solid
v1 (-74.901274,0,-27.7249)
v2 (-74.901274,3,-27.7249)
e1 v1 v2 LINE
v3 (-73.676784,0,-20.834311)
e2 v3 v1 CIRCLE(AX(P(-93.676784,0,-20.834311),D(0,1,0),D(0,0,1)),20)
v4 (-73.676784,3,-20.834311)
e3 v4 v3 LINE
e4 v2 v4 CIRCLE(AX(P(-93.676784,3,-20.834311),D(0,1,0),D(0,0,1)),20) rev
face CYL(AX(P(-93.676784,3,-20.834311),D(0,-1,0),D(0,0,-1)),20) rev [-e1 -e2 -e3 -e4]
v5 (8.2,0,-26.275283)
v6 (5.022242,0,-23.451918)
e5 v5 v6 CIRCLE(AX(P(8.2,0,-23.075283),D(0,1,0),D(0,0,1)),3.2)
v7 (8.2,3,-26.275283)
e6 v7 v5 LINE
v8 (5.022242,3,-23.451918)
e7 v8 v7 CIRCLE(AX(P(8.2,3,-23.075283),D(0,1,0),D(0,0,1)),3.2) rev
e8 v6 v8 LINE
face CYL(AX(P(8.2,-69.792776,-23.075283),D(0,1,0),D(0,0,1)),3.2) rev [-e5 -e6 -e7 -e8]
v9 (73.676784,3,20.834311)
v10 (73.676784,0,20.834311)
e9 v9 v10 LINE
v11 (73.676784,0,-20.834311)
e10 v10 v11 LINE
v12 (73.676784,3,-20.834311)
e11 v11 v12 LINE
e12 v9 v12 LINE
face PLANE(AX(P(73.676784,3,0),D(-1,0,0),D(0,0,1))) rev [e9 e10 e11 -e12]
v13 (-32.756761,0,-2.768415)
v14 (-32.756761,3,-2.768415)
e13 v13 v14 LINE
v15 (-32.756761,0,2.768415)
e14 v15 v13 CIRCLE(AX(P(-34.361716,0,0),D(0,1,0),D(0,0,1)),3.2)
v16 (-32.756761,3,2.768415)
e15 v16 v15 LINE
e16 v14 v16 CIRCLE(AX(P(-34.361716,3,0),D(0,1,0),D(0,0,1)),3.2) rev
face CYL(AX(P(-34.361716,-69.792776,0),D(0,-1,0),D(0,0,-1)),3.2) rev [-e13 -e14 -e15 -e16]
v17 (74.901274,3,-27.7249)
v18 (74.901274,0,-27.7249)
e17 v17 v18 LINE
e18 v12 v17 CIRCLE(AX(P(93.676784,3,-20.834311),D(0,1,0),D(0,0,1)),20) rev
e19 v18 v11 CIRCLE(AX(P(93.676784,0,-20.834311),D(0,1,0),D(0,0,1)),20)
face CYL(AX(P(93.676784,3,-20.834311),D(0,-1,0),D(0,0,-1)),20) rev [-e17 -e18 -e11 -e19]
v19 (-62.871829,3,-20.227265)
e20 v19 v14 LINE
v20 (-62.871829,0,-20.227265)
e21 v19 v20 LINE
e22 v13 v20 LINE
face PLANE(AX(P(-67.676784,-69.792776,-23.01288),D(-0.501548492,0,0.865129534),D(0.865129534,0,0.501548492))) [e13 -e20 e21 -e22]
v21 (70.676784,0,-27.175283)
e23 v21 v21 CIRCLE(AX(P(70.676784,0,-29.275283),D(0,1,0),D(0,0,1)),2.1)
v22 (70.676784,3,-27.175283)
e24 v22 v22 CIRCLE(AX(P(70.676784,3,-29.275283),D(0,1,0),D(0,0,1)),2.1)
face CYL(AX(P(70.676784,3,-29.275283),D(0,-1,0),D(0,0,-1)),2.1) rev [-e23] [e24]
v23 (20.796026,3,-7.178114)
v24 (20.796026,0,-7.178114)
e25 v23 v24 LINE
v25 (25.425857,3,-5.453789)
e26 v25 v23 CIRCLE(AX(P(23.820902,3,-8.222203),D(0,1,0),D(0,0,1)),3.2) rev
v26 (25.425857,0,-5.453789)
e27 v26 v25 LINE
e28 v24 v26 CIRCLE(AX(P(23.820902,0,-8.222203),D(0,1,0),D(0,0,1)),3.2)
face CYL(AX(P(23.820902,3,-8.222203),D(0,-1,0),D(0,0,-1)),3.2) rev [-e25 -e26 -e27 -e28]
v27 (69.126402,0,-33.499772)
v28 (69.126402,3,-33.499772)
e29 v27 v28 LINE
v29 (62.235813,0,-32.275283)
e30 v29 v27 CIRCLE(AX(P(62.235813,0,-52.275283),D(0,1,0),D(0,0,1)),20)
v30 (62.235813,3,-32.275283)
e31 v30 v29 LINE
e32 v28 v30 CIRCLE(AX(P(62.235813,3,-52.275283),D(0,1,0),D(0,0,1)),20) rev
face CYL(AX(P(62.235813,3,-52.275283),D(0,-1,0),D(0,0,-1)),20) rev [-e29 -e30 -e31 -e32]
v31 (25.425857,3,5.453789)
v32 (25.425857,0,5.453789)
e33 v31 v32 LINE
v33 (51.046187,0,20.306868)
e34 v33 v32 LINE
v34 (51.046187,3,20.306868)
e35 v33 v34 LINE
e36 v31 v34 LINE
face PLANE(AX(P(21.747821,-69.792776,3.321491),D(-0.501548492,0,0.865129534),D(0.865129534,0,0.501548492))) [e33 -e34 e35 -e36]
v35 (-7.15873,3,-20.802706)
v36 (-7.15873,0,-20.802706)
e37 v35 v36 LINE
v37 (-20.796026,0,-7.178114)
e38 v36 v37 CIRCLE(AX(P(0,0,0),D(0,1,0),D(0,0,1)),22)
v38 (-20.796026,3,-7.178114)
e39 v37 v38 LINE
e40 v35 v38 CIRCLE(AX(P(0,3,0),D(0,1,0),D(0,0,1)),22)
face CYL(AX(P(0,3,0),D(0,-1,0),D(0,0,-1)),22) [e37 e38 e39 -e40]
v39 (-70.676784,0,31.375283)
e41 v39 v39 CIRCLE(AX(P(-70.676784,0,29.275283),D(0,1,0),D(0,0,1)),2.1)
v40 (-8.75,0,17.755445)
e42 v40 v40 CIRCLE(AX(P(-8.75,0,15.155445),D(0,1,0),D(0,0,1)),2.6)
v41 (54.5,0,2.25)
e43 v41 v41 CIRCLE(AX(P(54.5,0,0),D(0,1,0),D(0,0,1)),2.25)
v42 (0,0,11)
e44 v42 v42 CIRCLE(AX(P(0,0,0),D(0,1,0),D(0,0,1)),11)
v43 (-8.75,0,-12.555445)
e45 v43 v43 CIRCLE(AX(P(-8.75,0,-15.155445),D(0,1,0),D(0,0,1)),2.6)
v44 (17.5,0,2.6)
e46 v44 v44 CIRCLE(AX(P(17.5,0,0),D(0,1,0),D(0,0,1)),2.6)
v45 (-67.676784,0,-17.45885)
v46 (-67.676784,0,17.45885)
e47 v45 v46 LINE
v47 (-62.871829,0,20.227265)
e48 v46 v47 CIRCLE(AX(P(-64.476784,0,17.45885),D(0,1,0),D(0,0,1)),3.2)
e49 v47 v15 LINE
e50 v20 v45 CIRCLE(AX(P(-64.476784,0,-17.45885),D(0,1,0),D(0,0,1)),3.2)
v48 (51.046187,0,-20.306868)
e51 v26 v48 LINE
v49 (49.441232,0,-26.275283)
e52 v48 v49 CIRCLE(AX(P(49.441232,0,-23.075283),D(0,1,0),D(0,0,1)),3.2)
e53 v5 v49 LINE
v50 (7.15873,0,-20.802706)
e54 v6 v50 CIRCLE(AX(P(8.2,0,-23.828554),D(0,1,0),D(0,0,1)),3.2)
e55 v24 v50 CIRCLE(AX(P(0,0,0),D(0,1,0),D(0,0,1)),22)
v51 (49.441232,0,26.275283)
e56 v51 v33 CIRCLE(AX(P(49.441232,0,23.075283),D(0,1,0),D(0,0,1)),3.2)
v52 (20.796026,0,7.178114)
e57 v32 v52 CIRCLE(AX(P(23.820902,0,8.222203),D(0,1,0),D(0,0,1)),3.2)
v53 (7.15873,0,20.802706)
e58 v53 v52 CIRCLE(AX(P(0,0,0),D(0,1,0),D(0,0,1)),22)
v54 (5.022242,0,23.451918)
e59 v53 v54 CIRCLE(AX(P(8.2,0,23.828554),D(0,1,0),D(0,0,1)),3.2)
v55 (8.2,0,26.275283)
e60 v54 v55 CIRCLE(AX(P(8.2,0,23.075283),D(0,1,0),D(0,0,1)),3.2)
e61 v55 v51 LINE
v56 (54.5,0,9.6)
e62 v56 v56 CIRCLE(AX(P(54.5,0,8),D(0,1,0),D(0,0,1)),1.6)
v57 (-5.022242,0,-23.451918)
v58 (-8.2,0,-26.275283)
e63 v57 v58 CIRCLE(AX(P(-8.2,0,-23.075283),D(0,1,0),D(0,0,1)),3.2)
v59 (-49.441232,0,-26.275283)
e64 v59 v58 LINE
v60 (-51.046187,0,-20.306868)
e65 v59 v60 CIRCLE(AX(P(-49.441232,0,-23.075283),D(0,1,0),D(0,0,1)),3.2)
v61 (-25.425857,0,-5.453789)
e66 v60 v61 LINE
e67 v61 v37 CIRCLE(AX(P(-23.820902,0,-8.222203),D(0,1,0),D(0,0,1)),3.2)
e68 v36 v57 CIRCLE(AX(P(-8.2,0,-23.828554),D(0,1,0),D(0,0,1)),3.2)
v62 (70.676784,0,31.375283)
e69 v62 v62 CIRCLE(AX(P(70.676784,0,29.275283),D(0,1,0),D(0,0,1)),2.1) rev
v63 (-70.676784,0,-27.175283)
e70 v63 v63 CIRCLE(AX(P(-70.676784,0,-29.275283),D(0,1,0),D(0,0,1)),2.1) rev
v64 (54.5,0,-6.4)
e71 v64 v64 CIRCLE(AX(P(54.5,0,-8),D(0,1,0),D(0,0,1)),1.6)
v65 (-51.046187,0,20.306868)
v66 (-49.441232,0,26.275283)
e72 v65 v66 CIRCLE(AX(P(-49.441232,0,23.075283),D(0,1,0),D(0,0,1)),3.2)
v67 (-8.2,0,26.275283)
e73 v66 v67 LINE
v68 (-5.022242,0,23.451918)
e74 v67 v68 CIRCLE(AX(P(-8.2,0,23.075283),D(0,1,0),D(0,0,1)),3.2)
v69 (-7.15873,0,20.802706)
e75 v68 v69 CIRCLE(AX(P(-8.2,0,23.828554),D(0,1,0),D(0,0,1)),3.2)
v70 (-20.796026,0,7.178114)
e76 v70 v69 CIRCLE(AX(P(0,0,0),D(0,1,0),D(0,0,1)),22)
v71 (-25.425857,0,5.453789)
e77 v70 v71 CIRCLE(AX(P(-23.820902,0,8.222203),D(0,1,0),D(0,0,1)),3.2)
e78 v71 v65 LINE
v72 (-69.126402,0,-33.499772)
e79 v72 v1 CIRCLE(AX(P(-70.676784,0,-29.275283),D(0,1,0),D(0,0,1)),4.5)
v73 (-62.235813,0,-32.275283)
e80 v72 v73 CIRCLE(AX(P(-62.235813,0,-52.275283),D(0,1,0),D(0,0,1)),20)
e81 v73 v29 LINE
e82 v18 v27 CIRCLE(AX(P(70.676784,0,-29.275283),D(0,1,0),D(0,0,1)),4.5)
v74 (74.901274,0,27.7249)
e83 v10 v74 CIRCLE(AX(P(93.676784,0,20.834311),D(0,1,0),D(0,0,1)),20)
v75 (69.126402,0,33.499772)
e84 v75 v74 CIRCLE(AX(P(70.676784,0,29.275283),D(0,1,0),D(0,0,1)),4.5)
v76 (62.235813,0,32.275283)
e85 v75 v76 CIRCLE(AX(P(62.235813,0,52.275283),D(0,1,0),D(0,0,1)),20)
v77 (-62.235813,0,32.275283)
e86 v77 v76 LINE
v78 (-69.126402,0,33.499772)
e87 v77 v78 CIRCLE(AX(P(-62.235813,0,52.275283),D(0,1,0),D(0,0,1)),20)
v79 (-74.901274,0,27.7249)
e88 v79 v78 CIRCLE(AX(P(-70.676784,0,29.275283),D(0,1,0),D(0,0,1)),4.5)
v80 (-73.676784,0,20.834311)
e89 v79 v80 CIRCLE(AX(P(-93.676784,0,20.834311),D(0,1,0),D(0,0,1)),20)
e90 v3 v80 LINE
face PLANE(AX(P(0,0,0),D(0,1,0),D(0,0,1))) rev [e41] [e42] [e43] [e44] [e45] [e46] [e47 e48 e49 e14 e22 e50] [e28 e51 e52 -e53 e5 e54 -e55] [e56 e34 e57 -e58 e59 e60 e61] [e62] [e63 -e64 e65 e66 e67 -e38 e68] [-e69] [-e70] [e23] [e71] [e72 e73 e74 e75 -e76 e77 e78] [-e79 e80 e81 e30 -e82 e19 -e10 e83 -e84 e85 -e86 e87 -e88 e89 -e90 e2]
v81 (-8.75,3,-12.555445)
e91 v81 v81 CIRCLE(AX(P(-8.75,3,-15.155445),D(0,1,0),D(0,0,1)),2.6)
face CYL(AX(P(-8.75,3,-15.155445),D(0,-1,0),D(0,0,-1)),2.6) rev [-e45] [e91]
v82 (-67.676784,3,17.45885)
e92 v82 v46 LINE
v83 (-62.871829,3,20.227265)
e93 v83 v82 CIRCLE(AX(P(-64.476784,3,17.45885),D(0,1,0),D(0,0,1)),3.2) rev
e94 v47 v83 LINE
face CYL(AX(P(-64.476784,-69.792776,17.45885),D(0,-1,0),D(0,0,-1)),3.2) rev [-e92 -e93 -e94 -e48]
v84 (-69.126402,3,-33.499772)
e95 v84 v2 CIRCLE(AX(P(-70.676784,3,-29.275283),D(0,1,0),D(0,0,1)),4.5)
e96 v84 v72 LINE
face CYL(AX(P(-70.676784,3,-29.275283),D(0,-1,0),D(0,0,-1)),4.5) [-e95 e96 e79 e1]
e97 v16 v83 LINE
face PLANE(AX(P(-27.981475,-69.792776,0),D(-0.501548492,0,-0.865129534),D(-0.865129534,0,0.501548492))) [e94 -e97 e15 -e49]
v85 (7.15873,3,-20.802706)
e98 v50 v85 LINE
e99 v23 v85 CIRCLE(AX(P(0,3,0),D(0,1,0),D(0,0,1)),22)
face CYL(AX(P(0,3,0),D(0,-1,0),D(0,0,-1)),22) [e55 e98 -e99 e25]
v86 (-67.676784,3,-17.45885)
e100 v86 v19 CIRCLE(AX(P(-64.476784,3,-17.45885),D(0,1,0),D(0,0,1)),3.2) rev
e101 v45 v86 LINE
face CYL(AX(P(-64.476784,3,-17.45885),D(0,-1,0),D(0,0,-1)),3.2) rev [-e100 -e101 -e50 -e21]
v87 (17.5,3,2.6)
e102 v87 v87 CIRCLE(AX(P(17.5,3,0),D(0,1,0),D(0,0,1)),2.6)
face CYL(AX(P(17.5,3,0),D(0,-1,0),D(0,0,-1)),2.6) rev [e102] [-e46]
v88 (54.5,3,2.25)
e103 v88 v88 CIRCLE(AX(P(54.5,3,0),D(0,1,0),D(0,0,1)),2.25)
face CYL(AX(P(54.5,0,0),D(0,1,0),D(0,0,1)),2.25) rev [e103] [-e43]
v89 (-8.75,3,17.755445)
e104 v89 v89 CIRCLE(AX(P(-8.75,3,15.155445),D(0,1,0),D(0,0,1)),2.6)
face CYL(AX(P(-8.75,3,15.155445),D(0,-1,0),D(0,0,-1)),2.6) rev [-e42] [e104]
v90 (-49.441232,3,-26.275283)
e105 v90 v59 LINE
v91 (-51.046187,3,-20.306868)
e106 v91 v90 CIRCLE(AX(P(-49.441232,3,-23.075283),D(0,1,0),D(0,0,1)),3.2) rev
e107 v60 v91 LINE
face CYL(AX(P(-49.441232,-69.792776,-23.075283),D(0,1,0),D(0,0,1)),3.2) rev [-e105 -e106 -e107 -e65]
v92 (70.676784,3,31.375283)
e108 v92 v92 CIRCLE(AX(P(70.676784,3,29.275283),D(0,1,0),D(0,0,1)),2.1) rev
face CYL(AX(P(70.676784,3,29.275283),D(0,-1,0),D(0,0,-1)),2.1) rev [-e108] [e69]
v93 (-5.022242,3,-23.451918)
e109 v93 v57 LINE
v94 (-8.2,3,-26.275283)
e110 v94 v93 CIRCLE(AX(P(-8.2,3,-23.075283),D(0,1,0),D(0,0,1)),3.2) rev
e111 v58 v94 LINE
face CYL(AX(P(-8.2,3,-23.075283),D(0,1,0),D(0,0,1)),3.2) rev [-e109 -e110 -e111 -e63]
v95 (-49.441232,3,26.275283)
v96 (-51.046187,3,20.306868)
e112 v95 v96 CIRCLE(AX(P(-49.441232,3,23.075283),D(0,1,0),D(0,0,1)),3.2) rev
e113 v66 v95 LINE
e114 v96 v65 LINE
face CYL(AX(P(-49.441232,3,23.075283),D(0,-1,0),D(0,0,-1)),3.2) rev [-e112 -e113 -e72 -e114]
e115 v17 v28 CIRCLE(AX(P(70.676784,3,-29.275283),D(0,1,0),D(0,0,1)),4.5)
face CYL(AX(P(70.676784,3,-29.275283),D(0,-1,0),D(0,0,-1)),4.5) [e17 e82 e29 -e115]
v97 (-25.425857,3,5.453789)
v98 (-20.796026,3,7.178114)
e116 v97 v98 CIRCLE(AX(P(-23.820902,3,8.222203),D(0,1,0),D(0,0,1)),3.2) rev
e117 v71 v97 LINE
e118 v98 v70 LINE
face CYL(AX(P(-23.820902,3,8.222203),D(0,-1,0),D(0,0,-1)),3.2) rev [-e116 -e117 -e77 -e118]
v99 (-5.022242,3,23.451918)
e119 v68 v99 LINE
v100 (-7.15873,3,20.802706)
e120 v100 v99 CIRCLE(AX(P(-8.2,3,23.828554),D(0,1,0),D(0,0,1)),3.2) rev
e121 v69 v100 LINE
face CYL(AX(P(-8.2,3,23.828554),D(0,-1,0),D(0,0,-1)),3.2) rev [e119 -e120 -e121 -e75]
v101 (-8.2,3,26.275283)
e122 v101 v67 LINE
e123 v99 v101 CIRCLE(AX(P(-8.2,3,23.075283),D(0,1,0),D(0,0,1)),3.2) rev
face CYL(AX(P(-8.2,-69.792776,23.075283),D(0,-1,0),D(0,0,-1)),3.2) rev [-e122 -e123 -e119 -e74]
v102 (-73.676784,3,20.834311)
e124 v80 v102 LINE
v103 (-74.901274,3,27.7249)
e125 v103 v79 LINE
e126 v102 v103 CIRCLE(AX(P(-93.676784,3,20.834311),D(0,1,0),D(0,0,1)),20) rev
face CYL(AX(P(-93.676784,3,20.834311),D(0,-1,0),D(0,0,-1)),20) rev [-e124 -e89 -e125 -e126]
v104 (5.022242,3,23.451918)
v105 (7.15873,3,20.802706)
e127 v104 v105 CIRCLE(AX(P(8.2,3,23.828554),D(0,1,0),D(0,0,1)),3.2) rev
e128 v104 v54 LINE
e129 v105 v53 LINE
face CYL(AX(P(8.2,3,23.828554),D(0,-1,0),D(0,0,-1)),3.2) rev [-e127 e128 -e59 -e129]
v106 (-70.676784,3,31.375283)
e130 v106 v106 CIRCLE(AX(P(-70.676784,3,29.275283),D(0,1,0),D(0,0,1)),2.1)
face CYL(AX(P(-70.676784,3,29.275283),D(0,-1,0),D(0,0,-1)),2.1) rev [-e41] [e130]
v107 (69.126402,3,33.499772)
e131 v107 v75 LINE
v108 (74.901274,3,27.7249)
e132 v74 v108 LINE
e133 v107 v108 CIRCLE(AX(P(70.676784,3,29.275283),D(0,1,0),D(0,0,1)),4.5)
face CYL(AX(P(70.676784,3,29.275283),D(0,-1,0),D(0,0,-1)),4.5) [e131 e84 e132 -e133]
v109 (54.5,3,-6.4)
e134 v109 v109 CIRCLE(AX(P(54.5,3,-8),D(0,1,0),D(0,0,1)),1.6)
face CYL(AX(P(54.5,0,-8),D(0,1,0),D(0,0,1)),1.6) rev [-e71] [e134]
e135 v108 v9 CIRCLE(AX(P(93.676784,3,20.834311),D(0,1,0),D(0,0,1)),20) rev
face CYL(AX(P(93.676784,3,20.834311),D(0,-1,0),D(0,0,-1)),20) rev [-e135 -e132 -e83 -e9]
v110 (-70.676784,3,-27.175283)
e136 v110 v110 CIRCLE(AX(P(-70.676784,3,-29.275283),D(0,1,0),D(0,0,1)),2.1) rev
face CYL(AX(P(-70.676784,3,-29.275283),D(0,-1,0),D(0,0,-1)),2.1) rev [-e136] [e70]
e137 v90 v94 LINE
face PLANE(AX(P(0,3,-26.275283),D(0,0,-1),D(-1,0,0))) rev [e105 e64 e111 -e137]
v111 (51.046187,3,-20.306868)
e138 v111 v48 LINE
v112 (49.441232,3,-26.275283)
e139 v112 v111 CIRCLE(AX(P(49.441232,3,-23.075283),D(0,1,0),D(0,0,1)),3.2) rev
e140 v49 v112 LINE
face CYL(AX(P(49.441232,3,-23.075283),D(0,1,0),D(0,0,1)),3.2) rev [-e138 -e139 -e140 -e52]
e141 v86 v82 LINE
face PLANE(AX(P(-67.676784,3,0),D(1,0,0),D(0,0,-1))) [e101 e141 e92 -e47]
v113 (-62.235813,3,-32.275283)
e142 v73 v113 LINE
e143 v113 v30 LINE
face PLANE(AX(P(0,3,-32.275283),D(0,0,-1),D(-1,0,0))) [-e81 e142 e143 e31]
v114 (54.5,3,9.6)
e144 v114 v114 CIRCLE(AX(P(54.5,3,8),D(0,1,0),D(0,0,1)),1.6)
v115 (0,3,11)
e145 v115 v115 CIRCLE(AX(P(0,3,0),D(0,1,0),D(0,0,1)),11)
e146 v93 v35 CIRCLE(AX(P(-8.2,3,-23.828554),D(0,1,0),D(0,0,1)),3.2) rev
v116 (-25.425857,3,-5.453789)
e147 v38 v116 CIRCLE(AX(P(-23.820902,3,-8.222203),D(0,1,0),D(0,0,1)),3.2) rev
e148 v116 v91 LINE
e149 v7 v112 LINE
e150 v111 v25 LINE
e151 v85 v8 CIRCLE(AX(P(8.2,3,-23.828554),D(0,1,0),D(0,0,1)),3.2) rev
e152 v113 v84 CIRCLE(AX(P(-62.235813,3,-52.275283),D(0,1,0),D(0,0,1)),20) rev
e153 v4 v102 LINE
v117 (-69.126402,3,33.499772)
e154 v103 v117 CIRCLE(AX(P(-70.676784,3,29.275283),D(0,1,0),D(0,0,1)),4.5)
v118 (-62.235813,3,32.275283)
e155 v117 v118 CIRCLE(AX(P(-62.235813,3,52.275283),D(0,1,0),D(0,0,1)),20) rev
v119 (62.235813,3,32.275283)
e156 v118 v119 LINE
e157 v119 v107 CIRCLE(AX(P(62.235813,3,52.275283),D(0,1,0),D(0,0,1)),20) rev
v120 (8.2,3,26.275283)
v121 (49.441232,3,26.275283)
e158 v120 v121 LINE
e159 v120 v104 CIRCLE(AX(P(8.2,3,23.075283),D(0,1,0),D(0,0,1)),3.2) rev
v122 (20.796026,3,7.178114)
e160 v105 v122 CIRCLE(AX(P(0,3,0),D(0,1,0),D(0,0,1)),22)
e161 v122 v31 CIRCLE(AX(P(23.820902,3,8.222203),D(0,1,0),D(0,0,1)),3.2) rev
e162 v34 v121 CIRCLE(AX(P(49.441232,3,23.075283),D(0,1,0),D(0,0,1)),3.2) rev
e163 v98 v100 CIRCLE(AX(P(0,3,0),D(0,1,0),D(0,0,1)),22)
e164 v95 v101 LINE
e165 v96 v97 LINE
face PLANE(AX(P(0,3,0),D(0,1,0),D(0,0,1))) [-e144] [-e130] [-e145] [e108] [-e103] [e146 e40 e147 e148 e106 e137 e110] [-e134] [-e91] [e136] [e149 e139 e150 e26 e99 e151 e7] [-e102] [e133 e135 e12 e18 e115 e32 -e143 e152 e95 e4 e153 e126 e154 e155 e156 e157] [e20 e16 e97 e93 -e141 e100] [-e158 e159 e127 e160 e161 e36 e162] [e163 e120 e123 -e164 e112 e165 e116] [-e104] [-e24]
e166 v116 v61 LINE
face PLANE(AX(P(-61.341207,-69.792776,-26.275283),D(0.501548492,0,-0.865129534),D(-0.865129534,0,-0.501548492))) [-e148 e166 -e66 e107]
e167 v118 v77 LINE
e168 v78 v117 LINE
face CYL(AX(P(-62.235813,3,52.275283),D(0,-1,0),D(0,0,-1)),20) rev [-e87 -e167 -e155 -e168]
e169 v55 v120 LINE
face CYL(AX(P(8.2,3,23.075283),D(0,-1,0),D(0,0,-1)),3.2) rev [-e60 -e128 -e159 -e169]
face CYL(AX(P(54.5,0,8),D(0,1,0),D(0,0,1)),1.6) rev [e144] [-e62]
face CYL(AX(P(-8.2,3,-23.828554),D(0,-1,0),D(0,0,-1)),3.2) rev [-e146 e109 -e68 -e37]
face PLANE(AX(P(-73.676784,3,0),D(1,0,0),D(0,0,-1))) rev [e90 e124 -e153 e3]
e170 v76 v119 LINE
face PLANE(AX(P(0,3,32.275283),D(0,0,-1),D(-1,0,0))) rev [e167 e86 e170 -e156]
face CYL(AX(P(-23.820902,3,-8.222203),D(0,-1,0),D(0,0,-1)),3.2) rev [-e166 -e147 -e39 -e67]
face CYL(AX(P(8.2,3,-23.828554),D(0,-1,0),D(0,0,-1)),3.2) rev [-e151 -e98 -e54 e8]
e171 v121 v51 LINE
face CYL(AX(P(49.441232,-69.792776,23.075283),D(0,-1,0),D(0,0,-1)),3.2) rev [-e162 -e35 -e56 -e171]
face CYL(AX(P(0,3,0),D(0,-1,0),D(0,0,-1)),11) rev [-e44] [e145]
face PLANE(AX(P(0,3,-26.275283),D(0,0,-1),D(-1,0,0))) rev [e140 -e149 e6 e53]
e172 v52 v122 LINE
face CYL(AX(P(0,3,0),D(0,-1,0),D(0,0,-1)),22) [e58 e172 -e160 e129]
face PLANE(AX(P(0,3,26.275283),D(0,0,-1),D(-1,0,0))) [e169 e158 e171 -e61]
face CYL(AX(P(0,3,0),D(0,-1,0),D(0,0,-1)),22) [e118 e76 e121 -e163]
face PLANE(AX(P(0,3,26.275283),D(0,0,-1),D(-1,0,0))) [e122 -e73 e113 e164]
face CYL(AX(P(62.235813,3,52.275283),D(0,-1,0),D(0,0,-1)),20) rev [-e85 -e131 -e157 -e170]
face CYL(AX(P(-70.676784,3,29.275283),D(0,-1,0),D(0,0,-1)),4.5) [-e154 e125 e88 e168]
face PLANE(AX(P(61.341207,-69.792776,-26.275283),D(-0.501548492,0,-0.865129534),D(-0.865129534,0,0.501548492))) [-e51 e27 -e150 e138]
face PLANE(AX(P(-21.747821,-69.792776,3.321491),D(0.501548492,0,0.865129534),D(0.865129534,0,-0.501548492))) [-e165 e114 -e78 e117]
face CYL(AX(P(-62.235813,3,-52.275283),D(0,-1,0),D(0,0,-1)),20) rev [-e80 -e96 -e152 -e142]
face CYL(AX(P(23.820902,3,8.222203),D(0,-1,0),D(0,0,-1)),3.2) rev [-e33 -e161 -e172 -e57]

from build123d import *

# Parameters (mm, degrees)
SKETCH_1_R          = 2.1
EXTRUDE_1_DEPTH     = 3
SKETCH_1_R_2        = 22
SKETCH_1_R_3        = 2.6
SKETCH_1_R_4        = 11
EXTRUDE_1_2_DEPTH   = 3
EXTRUDE_START       = -3
EXTRUDE_2_DEPTH     = 3
FILLET_1_R          = 3.2
FILLET_2_R          = 20
EXTRUDE_4_DEPTH     = 3
SKETCH_4_R          = 2.25
SKETCH_4_R_2        = 1.6
CUT_EXTRUDE_1_DEPTH = 83.47010732


with BuildPart() as part:
    # 草图1 → 凸台-拉伸1 (new body)
    with BuildSketch(Plane(origin=(0, 0, 0), x_dir=(1, 0, 0), z_dir=(0, 1, 0))):
        with BuildLine():
            Line((-67.322682271, -32.275282576), (67.322682271, -32.275282576))
            ThreePointArc((67.322682271, -32.275282576), (73.858764752, -32.457263091), (73.676784237, -25.92118061))
            Line((73.676784237, -25.92118061), (73.676784237, 25.92118061))
            ThreePointArc((73.676784237, 25.92118061), (73.858764752, 32.457263091), (67.322682271, 32.275282576))
            Line((67.322682271, 32.275282576), (-67.322682271, 32.275282576))
            ThreePointArc((-67.322682271, 32.275282576), (-73.858764752, 32.457263091), (-73.676784237, 25.92118061))
            Line((-73.676784237, 25.92118061), (-73.676784237, -25.92118061))
            ThreePointArc((-73.676784237, -25.92118061), (-73.858764752, -32.457263091), (-67.322682271, -32.275282576))
        make_face()
        with Locations(Location((70.676784237, -29.275282576, 0), (0, 0, 270))):
            Circle(SKETCH_1_R, mode=Mode.SUBTRACT)
        with Locations(Location((-70.676784237, -29.275282576, 0), (0, 0, 270))):
            Circle(SKETCH_1_R, mode=Mode.SUBTRACT)
        with Locations(Location((70.676784237, 29.275282576, 0), (0, 0, 270))):
            Circle(SKETCH_1_R, mode=Mode.SUBTRACT)
        with Locations(Location((-70.676784237, 29.275282576, 0), (0, 0, 270))):
            Circle(SKETCH_1_R, mode=Mode.SUBTRACT)
        with BuildLine():
            Line((-67.322682271, 26.275282576), (67.322682271, 26.275282576))
            ThreePointArc((67.322682271, 26.275282576), (67.494803722, 26.093302061), (67.676784237, 25.92118061))
            Line((67.676784237, 25.92118061), (67.676784237, -25.92118061))
            ThreePointArc((67.676784237, -25.92118061), (67.494803722, -26.093302061), (67.322682271, -26.275282576))
            Line((67.322682271, -26.275282576), (-67.322682271, -26.275282576))
            ThreePointArc((-67.322682271, -26.275282576), (-67.494803722, -26.093302061), (-67.676784237, -25.92118061))
            Line((-67.676784237, -25.92118061), (-67.676784237, 25.92118061))
            ThreePointArc((-67.676784237, 25.92118061), (-67.494803722, 26.093302061), (-67.322682271, 26.275282576))
        make_face(mode=Mode.SUBTRACT)
    extrude(amount=EXTRUDE_1_DEPTH)



with BuildPart() as body_2:
    # 草图1 → Extrude 1 2 (new body)
    with BuildSketch(Plane(origin=(0, 0, 0), x_dir=(1, 0, 0), z_dir=(0, 1, 0))):
        with Locations(Location((0, 0, 0), (0, 0, 270))):
            Circle(SKETCH_1_R_2)
        with Locations(Location((-8.75, 15.155444566, 0), (0, 0, 270))):
            Circle(SKETCH_1_R_3, mode=Mode.SUBTRACT)
        with Locations(Location((0, 0, 0), (0, 0, 270))):
            Circle(SKETCH_1_R_4, mode=Mode.SUBTRACT)
        with Locations(Location((-8.75, -15.155444566, 0), (0, 0, 270))):
            Circle(SKETCH_1_R_3, mode=Mode.SUBTRACT)
        with Locations(Location((17.5, 0, 0), (0, 0, 270))):
            Circle(SKETCH_1_R_3, mode=Mode.SUBTRACT)
    extrude(amount=EXTRUDE_1_2_DEPTH)


with BuildPart() as part_1:
    add(part.part)

    add(body_2.part)  # 凸台-拉伸2 merges body 2
    # 草图2 → 凸台-拉伸2 (add)
    with BuildSketch(Plane(origin=(0, 3, 0), x_dir=(1, 0, 0), z_dir=(0, 1, 0)).offset(EXTRUDE_START)):
        with BuildLine():
            Line((-5, 26.275282576), (-5, 21.424285286))
            ThreePointArc((-5, 21.424285286), (0, 22), (5, 21.424285286))
            Line((5, 21.424285286), (5, 26.275282576))
            Line((5, 26.275282576), (-5, 26.275282576))
        make_face()
        with BuildLine():
            Line((5, -26.275282576), (5, -21.424285286))
            ThreePointArc((5, -21.424285286), (0, -22), (-5, -21.424285286))
            Line((-5, -21.424285286), (-5, -26.275282576))
            Line((-5, -26.275282576), (5, -26.275282576))
        make_face()
        with BuildLine():
            Line((-67.676784237, 23.012880146), (-27.981475463, 0))
            Line((-27.981475463, 0), (-67.676784237, -23.012880146))
            Line((-67.676784237, -23.012880146), (-67.676784237, -25.92118061))
            ThreePointArc((-67.676784237, -25.92118061), (-67.494803722, -26.093302061), (-67.322682271, -26.275282576))
            Line((-67.322682271, -26.275282576), (-61.341206808, -26.275282576))
            Line((-61.341206808, -26.275282576), (-21.747820556, -3.321490792))
            ThreePointArc((-21.747820556, -3.321490792), (-22, 0), (-21.747820556, 3.321490792))
            Line((-21.747820556, 3.321490792), (-61.341206808, 26.275282576))
            Line((-61.341206808, 26.275282576), (-67.322682271, 26.275282576))
            ThreePointArc((-67.322682271, 26.275282576), (-67.494803722, 26.093302061), (-67.676784237, 25.92118061))
            Line((-67.676784237, 25.92118061), (-67.676784237, 23.012880146))
        make_face()
        with BuildLine():
            Line((61.341206808, 26.275282576), (21.747820556, 3.321490792))
            ThreePointArc((21.747820556, 3.321490792), (22, 0), (21.747820556, -3.321490792))
            Line((21.747820556, -3.321490792), (61.341206808, -26.275282576))
            Line((61.341206808, -26.275282576), (67.322682271, -26.275282576))
            ThreePointArc((67.322682271, -26.275282576), (67.494803722, -26.093302061), (67.676784237, -25.92118061))
            Line((67.676784237, -25.92118061), (67.676784237, -23.012880146))
            Line((67.676784237, -23.012880146), (27.981475463, 0))
            Line((27.981475463, 0), (67.676784237, 23.012880146))
            Line((67.676784237, 23.012880146), (67.676784237, 25.92118061))
            ThreePointArc((67.676784237, 25.92118061), (67.494803722, 26.093302061), (67.322682271, 26.275282576))
            Line((67.322682271, 26.275282576), (61.341206808, 26.275282576))
        make_face()
    extrude(amount=EXTRUDE_2_DEPTH)

    # 圆角1
    # the kernel refuses this fillet: 3.2 mm, written as the material it adds along each edge
    with BuildSketch(Plane(origin=(-27.981475463, 0, 0), x_dir=(-0.8651295335829952, 0, -0.5015484922940843), z_dir=(0, 1, 0))) as fillet_1_piece_1:
        with BuildLine():
            CenterArc((FILLET_1_R * 1.72491702572, FILLET_1_R), FILLET_1_R, 150.205000829, 119.794999171)
            Line((FILLET_1_R * 0.857108199306, FILLET_1_R * 1.49689821976), (0, 0))
            Line((0, 0), (FILLET_1_R * 1.72491702572, 0))
        make_face()
    extrude(amount=3)
    with BuildSketch(Plane(origin=(-67.676784237, 0, 23.012880146), x_dir=(0, 0, -1), z_dir=(0, 1, 0))) as fillet_1_piece_2:
        with BuildLine():
            CenterArc((FILLET_1_R * 1.73563429984, -FILLET_1_R), FILLET_1_R, 90, 120.102500415)
            Line((FILLET_1_R * 0.87050476626, -FILLET_1_R * 1.50154849229), (0, 0))
            Line((0, 0), (FILLET_1_R * 1.73563429984, 0))
        make_face()
    extrude(amount=3)
    with BuildSketch(Plane(origin=(5, 0, 21.424285286), x_dir=(0, 0, 1), z_dir=(0, 1, 0)), Plane(origin=(-5, 0, -21.424285286), x_dir=(0, 0, -1), z_dir=(0, 1, 0))) as fillet_1_piece_3:
        with BuildLine():
            CenterArc((2.404269014, 3.2), FILLET_1_R, 198.989618262, 71.010381738)
            ThreePointArc((-0.621579151, 2.158730159), (-0.283217903, 1.087303995), (0, 0))
            Line((0, 0), (2.404269014, 0))
        make_face()
    extrude(amount=3)
    with BuildSketch(Plane(origin=(21.747820556, 0, 3.321490792), x_dir=(0.8651295335829955, 0, 0.5015484922940839), z_dir=(0, 1, 0)), Plane(origin=(-21.747820556, 0, -3.321490792), x_dir=(-0.8651295335829956, 0, -0.5015484922940837), z_dir=(0, 1, 0))) as fillet_1_piece_4:
        with BuildLine():
            CenterArc((4.251428919, -3.2), FILLET_1_R, 90, 101.059486295)
            ThreePointArc((1.110857558, -3.813849756), (0.641683834, -1.881801424), (0, 0))
            Line((0, 0), (4.251428919, 0))
        make_face()
    extrude(amount=3)
    with BuildSketch(Plane(origin=(61.341206808, 0, 26.275282576), x_dir=(-0.8651295335829955, 0, -0.5015484922940838), z_dir=(0, 1, 0)), Plane(origin=(61.341206808, 0, -26.275282576), x_dir=(-1, 0, 0), z_dir=(0, 1, 0)), Plane(origin=(-61.341206808, 0, 26.275282576), x_dir=(1, 0, 0), z_dir=(0, 1, 0))) as fillet_1_piece_5:
        with BuildLine():
            CenterArc((FILLET_1_R * 3.71874217995, FILLET_1_R), FILLET_1_R, 120.102500415, 149.897499585)
            Line((FILLET_1_R * 3.21719368765, FILLET_1_R * 1.86512953358), (0, 0))
            Line((0, 0), (FILLET_1_R * 3.71874217995, 0))
        make_face()
    extrude(amount=3)
    with BuildSketch(Plane(origin=(5, 0, 26.275282576), x_dir=(1, 0, 0), z_dir=(0, 1, 0)), Plane(origin=(-5, 0, -26.275282576), x_dir=(-1, 0, 0), z_dir=(0, 1, 0)), Plane(origin=(5, 0, -26.275282576), x_dir=(0, 0, 1), z_dir=(0, 1, 0)), Plane(origin=(-5, 0, 26.275282576), x_dir=(0, 0, -1), z_dir=(0, 1, 0))) as fillet_1_piece_6:
        with BuildLine():
            CenterArc((FILLET_1_R, FILLET_1_R), FILLET_1_R, 180, 90)
            Line((0, FILLET_1_R), (0, 0))
            Line((0, 0), (FILLET_1_R, 0))
        make_face()
    extrude(amount=3)
    with BuildSketch(Plane(origin=(-61.341206808, 0, -26.275282576), x_dir=(1, 0, 0), z_dir=(0, 1, 0))) as fillet_1_piece_7:
        with BuildLine():
            CenterArc((FILLET_1_R * 3.71874217995, -FILLET_1_R), FILLET_1_R, 90, 149.897499585)
            Line((FILLET_1_R * 3.21719368765, -FILLET_1_R * 1.86512953358), (0, 0))
            Line((0, 0), (FILLET_1_R * 3.71874217995, 0))
        make_face()
    extrude(amount=3)
    with BuildSketch(Plane(origin=(21.747820556, 0, -3.321490792), x_dir=(0.8651295335829948, 0, -0.5015484922940848), z_dir=(0, 1, 0)), Plane(origin=(-21.747820556, 0, 3.321490792), x_dir=(-0.8651295335829947, 0, 0.5015484922940853), z_dir=(0, 1, 0))) as fillet_1_piece_8:
        with BuildLine():
            CenterArc((4.251428919, 3.2), FILLET_1_R, 168.940513705, 101.059486295)
            ThreePointArc((1.110857558, 3.813849756), (0.641683834, 1.881801424), (0, 0))
            Line((0, 0), (4.251428919, 0))
        make_face()
    extrude(amount=3)
    with BuildSketch(Plane(origin=(5, 0, -21.424285286), x_dir=(0, 0, -1), z_dir=(0, 1, 0)), Plane(origin=(-5, 0, 21.424285286), x_dir=(0, 0, 1), z_dir=(0, 1, 0))) as fillet_1_piece_9:
        with BuildLine():
            CenterArc((2.404269014, -3.2), FILLET_1_R, 90, 71.010381738)
            ThreePointArc((-0.621579151, -2.158730159), (-0.283217903, -1.087303995), (0, 0))
            Line((0, 0), (2.404269014, 0))
        make_face()
    extrude(amount=3)
    with BuildSketch(Plane(origin=(-67.676784237, 0, -23.012880146), x_dir=(0, 0, 1), z_dir=(0, 1, 0))) as fillet_1_piece_10:
        with BuildLine():
            CenterArc((FILLET_1_R * 1.73563429984, FILLET_1_R), FILLET_1_R, 149.897499585, 120.102500415)
            Line((FILLET_1_R * 0.87050476626, FILLET_1_R * 1.50154849229), (0, 0))
            Line((0, 0), (FILLET_1_R * 1.73563429984, 0))
        make_face()
    extrude(amount=3)

    # 圆角2
    fillet_2_edges = [part_1.edges().sort_by_distance(p)[0] for p in [
        (-67.322682271, 1.5, 32.275282576),
        (-73.676784237, 1.5, 25.92118061),
        (-73.676784237, 1.5, -25.92118061),
        (-67.322682271, 1.5, -32.275282576),
        (67.322682271, 1.5, -32.275282576),
        (73.676784237, 1.5, -25.92118061),
        (73.676784237, 1.5, 25.92118061),
        (67.322682271, 1.5, 32.275282576),
    ]]
    fillet(fillet_2_edges, radius=FILLET_2_R)

    # 草图3 → 凸台-拉伸4 (add)
    with BuildSketch(Plane(origin=(0, 3, 0), x_dir=(1, 0, 0), z_dir=(0, 1, 0))):
        Polygon((67.676784237, 23.012880146), (27.981475463, 0), (67.676784237, -23.012880146), align=None)
    extrude(amount=-EXTRUDE_4_DEPTH)

    # 草图4 → 切除-拉伸1 (cut, through all)
    with BuildSketch(Plane(origin=(0, 3, 0), x_dir=(1, 0, 0), z_dir=(0, 1, 0))):
        with Locations(Location((54.5, 0, 0), (0, 0, 270))):
            Circle(SKETCH_4_R)
        with Locations(Location((54.5, 8, 0), (0, 0, 270))):
            Circle(SKETCH_4_R_2)
        with Locations(Location((54.5, -8, 0), (0, 0, 270))):
            Circle(SKETCH_4_R_2)
    extrude(amount=-CUT_EXTRUDE_1_DEPTH, mode=Mode.SUBTRACT)


solid = part_1.part
